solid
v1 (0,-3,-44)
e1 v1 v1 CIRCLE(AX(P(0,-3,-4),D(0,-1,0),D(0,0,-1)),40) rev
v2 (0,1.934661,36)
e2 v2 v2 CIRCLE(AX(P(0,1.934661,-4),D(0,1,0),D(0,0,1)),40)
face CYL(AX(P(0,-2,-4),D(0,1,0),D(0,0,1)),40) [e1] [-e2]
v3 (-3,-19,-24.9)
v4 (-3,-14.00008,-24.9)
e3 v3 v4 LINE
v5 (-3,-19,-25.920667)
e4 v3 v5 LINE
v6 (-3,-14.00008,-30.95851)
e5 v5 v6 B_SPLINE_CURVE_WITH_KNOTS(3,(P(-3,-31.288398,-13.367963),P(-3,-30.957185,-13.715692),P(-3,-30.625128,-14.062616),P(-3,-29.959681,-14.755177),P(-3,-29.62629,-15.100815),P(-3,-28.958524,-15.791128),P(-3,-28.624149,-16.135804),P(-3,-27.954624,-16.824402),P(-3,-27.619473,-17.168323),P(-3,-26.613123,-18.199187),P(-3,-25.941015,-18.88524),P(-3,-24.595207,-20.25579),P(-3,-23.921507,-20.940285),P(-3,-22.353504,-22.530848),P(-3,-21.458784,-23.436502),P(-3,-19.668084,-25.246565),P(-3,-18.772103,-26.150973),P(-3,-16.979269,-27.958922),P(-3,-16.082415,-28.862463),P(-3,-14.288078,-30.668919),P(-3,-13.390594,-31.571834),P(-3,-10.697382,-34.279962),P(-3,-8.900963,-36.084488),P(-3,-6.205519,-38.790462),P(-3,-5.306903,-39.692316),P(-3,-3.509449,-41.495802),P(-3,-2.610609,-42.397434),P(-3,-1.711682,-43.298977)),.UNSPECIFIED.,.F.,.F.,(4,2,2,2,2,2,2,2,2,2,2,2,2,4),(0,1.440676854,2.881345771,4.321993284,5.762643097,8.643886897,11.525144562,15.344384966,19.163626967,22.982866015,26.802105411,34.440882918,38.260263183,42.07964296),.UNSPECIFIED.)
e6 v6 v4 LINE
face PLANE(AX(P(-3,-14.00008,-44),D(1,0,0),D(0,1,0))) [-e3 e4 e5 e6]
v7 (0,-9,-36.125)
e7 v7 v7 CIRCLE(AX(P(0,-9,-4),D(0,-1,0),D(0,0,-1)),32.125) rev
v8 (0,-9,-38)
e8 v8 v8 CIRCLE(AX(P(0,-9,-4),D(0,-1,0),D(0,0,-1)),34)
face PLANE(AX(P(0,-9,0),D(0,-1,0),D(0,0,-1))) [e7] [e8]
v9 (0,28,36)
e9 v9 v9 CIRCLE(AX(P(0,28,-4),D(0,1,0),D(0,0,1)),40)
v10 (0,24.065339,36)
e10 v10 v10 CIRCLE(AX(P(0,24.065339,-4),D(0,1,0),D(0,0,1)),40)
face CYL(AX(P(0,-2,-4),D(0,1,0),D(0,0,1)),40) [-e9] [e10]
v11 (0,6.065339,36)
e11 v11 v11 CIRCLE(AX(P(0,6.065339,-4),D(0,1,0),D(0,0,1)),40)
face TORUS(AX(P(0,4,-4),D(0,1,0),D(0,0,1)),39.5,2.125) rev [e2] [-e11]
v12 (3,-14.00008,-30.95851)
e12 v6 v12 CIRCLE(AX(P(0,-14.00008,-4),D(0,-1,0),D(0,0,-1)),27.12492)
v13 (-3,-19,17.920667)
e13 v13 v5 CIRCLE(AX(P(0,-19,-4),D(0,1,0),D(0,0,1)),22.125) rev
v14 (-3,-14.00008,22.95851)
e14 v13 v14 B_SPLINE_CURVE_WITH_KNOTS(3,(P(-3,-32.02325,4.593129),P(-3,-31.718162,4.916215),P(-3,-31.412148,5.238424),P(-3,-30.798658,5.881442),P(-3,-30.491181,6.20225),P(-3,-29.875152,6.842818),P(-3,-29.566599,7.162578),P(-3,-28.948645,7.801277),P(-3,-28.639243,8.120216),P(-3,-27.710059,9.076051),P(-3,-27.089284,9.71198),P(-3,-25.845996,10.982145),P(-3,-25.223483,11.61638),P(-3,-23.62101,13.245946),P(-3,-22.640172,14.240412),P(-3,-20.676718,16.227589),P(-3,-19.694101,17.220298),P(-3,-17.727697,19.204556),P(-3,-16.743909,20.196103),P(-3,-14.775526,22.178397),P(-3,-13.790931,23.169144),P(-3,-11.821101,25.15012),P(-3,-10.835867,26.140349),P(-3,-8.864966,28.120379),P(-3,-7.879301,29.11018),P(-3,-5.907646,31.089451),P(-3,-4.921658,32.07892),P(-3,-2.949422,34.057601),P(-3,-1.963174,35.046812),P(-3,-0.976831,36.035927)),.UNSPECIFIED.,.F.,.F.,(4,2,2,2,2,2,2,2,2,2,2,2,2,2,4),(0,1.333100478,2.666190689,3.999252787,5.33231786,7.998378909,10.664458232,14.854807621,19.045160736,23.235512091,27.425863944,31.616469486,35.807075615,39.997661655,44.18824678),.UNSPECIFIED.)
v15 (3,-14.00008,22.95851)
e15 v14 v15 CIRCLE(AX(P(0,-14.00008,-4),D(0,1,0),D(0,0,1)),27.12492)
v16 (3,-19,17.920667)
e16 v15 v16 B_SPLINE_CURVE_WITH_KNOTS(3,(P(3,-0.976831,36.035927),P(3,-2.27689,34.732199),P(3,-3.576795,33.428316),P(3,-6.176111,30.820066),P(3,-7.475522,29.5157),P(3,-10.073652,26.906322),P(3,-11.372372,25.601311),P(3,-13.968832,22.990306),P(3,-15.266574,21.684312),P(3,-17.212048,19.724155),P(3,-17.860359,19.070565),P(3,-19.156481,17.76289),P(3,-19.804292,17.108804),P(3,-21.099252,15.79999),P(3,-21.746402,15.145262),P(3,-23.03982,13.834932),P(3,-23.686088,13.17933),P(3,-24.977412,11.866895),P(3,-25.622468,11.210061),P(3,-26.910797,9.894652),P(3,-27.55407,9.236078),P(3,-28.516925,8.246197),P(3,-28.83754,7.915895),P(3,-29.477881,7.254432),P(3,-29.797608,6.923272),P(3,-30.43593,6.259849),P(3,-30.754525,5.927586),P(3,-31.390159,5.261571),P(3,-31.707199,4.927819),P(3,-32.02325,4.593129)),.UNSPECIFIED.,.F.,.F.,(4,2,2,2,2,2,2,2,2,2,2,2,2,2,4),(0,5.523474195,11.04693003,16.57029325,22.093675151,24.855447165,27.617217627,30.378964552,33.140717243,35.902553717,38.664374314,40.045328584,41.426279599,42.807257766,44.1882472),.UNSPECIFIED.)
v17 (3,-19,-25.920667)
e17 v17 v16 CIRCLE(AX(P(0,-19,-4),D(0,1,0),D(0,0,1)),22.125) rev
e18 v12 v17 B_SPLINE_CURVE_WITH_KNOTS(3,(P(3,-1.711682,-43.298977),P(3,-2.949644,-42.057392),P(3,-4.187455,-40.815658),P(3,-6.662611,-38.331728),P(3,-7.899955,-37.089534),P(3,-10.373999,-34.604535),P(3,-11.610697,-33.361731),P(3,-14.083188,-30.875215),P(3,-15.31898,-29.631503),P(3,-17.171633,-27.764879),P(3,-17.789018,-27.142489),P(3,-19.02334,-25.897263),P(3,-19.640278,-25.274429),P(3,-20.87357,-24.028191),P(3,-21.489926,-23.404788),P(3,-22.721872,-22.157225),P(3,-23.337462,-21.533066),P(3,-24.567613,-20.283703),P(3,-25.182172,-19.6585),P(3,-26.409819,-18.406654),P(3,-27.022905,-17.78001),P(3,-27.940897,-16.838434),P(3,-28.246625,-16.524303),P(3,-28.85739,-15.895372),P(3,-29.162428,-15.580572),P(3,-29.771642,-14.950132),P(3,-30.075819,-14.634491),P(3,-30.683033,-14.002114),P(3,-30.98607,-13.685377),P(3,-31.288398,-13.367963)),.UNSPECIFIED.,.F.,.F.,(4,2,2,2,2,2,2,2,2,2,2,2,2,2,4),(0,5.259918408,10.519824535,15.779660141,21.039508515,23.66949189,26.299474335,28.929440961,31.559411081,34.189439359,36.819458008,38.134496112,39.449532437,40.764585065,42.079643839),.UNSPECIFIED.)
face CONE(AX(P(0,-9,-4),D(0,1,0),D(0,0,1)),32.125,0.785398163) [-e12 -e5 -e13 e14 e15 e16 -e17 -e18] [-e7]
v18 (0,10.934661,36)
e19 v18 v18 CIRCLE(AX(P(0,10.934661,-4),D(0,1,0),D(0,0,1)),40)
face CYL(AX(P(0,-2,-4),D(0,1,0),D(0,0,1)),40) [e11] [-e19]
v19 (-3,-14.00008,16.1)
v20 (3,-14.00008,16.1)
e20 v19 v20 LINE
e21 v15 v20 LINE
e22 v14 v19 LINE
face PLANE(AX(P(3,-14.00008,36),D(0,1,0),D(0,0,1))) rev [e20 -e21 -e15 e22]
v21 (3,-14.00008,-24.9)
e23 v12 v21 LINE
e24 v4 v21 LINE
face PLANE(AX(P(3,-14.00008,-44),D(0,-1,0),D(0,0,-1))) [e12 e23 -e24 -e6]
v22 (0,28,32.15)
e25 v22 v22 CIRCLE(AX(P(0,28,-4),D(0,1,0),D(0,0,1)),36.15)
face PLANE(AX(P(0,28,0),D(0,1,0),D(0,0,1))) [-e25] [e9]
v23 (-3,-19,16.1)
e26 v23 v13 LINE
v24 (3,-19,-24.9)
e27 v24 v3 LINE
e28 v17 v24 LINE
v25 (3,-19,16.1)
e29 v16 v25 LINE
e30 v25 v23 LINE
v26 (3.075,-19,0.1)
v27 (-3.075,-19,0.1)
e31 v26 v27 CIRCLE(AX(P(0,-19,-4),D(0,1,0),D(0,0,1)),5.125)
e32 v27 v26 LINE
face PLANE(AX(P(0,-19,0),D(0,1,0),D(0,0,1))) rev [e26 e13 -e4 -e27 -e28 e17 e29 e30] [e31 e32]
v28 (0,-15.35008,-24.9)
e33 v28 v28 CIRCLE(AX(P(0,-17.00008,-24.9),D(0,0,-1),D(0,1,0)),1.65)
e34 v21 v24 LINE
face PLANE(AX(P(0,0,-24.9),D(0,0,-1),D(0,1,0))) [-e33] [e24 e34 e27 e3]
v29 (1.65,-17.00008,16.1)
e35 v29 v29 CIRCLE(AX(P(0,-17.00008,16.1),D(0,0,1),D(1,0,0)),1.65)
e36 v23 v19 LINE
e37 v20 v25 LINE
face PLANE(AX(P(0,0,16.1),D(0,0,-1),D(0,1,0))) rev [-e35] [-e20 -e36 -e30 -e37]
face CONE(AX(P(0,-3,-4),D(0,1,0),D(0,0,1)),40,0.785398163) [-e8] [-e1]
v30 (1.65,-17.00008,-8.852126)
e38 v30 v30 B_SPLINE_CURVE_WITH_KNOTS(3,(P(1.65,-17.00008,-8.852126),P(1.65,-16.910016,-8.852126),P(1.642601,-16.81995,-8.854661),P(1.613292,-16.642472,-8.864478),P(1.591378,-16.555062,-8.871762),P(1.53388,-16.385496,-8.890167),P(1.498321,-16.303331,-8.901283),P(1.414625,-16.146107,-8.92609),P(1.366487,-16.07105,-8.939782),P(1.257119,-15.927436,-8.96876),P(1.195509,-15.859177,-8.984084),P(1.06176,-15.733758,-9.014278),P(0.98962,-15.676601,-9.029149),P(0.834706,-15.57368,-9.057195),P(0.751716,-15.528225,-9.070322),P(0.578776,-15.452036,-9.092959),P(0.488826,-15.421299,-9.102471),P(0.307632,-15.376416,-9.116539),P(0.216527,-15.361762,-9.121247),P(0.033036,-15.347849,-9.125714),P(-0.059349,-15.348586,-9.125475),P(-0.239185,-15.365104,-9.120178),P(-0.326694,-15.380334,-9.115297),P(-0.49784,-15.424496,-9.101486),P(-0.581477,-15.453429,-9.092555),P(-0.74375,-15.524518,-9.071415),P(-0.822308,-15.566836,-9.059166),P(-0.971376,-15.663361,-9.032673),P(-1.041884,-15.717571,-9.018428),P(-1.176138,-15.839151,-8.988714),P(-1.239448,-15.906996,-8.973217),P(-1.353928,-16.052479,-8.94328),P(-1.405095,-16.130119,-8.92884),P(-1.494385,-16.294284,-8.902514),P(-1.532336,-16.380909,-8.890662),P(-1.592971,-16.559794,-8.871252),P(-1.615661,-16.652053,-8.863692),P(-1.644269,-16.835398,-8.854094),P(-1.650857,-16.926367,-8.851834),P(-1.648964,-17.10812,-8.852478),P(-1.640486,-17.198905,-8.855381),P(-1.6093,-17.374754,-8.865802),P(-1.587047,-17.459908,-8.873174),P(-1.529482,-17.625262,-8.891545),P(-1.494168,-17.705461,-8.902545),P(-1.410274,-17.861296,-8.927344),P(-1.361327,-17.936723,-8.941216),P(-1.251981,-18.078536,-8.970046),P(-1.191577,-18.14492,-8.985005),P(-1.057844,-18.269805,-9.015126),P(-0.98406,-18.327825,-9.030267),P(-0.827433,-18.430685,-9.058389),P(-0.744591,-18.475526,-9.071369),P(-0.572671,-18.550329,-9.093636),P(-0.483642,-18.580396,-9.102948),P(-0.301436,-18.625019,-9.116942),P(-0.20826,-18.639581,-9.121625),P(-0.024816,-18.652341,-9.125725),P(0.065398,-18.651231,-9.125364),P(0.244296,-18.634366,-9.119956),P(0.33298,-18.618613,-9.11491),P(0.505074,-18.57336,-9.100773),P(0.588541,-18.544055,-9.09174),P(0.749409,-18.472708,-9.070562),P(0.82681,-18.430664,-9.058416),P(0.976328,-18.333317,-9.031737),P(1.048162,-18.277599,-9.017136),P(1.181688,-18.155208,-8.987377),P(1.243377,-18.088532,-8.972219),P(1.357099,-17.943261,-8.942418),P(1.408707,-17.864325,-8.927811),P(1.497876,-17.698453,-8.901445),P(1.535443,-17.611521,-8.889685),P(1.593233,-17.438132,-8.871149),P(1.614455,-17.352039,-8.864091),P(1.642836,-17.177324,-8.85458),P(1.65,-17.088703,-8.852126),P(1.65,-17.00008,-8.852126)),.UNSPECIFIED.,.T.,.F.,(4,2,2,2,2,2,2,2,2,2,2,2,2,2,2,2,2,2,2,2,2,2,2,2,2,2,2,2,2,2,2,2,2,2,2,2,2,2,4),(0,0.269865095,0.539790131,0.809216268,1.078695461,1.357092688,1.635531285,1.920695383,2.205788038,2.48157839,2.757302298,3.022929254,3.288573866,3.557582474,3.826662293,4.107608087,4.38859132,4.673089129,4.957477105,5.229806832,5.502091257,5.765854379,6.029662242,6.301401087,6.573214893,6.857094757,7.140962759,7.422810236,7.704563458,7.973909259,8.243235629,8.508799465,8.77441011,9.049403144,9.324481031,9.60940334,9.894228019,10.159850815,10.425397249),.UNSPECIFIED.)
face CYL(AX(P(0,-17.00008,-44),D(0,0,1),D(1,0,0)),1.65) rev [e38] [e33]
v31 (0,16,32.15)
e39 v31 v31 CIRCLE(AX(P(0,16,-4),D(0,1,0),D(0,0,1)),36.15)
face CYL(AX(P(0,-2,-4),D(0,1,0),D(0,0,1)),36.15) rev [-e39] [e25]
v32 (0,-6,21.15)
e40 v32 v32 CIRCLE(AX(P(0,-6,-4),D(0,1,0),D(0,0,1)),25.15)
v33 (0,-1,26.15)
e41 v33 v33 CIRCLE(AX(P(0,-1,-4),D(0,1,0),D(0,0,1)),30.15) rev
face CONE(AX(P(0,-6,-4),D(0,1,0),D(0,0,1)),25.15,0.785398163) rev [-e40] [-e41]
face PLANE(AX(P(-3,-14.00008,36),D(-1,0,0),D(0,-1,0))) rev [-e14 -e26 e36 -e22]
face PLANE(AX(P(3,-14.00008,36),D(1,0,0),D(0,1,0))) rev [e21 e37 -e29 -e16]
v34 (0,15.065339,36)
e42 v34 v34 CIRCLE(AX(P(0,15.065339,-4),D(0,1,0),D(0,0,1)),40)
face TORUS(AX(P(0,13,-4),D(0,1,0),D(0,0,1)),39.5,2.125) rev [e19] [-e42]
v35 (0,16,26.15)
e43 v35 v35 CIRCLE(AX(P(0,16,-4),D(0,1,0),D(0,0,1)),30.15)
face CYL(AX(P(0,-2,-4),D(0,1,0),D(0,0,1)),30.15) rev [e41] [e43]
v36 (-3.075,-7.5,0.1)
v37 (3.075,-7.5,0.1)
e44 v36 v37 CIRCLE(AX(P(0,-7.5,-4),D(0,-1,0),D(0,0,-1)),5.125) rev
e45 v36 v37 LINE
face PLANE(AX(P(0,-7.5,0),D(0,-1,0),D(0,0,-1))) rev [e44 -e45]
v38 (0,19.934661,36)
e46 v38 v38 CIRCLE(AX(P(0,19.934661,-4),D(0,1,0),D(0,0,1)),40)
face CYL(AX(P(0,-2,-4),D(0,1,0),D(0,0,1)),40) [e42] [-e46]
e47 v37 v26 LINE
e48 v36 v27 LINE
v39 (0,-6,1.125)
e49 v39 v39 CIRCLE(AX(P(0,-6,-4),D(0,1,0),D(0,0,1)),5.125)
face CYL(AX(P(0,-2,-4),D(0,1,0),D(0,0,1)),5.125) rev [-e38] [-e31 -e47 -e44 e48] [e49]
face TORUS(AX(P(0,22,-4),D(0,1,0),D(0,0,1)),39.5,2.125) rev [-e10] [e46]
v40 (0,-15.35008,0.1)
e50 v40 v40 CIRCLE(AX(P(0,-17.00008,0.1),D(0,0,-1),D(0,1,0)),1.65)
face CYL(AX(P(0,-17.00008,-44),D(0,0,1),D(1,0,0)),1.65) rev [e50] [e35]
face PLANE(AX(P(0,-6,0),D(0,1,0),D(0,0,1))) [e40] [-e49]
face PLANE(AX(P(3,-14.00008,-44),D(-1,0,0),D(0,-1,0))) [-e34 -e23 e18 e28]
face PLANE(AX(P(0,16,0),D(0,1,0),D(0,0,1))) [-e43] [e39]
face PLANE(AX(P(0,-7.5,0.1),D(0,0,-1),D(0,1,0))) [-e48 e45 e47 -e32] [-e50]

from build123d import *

# Parameters (mm, degrees)
CHAMFER_1_SIZE      = 5
EXTRUDE_START       = -11.5
EXTRUDE_1_DEPTH     = 11.5
CHAMFER_2_SIZE      = 12
CUT_EXTRUDE_START   = -16
SKETCH_4_W          = 6
SKETCH_4_H          = 6
CUT_EXTRUDE_1_DEPTH = 50.793692707
CUT_EXTRUDE_START_2 = 25
SKETCH_4_2_W        = 6
SKETCH_4_2_H        = 6
CUT_EXTRUDE_2_DEPTH = 41.793692707
SKETCH_5_R          = 1.65
CUT_EXTRUDE_3_DEPTH = 78.433907302
CHAMFER_3_SIZE      = 6


with BuildPart() as part:
    # ｽｹｯﾁ2 → 回転1 (revolve)
    with BuildSketch(Plane(origin=(0, 0, 0), x_dir=(0, 0, -1), z_dir=(1, 0, 0))):
        with BuildLine():
            Line((-16.125, -19), (-1.125, -19))
            Line((-1.125, -19), (-1.125, -6))
            Line((-1.125, -6), (-26.15, -6))
            Line((-26.15, -6), (-26.15, 16))
            Line((-26.15, 16), (-32.15, 16))
            Line((-32.15, 16), (-32.15, 28))
            Line((-32.15, 28), (-36, 28))
            Line((-36, 28), (-36, 24.065338955))
            ThreePointArc((-36, 24.065338955), (-34.186012747, 23.670048652), (-33.375, 22))
            ThreePointArc((-33.375, 22), (-34.186012747, 20.329951348), (-36, 19.934661045))
            Line((-36, 19.934661045), (-36, 15.065338955))
            ThreePointArc((-36, 15.065338955), (-34.186012747, 14.670048652), (-33.375, 13))
            ThreePointArc((-33.375, 13), (-34.186012747, 11.329951348), (-36, 10.934661045))
            Line((-36, 10.934661045), (-36, 6.065338955))
            ThreePointArc((-36, 6.065338955), (-34.186012747, 5.670048652), (-33.375, 4))
            ThreePointArc((-33.375, 4), (-34.186012747, 2.329951348), (-36, 1.934661045))
            Line((-36, 1.934661045), (-36, -9))
            Line((-36, -9), (-16.125, -9))
            Line((-16.125, -9), (-16.125, -19))
        make_face()
    revolve(axis=Axis((0, -2, -4), (0, -1, 0)))

    # 面取り1
    chamfer_1_edges = [part.edges().sort_by_distance(p)[0] for p in [
        (0, -6, -34.15),
    ]]
    chamfer(chamfer_1_edges, length=CHAMFER_1_SIZE)

    # ｽｹｯﾁ3 → ﾎﾞｽ - 押し出し1 (add)
    with BuildSketch(Plane.XZ.offset(19).offset(EXTRUDE_START)):
        with BuildLine():
            ThreePointArc((3.075, 0.1), (0, 1.125), (-3.075, 0.1))
            Line((-3.075, 0.1), (3.075, 0.1))
        make_face()
    extrude(amount=EXTRUDE_1_DEPTH)

    # 面取り2
    # the kernel refuses this chamfer: 12 mm, written as the material it adds along each edge
    with BuildSketch(Plane(origin=(0, -9, -4), x_dir=(0, 0, 1), z_dir=(1, 0, 0))) as chamfer_2_piece_1_section:
        Polygon((20.125, CHAMFER_2_SIZE), (20.125 + CHAMFER_2_SIZE, 0), (20.125, 0), align=None)
    chamfer_2_piece_1 = revolve(axis=Axis((0, -9, -4), (0, -1, 0)), mode=Mode.PRIVATE)
    chamfer_2_piece_1 = split(chamfer_2_piece_1, bisect_by=Plane(origin=(0, -19, -31.134676639), z_dir=(0, 1, 0)), keep=Keep.TOP, mode=Mode.PRIVATE)
    add(chamfer_2_piece_1)

    # ｽｹｯﾁ4 → ｶｯﾄ - 押し出し1 (cut, through all)
    with BuildSketch(Plane(origin=(0, 0, 0.1), x_dir=(-1, 0, 0), z_dir=(0, 0, -1)).offset(CUT_EXTRUDE_START)):
        with Locations((0, -17.000080491)):
            Rectangle(SKETCH_4_W, SKETCH_4_H)
    extrude(amount=-CUT_EXTRUDE_1_DEPTH, mode=Mode.SUBTRACT)

    # ｽｹｯﾁ4<2> → ｶｯﾄ - 押し出し2 (cut, through all)
    with BuildSketch(Plane(origin=(0, 0, 0.1), x_dir=(-1, 0, 0), z_dir=(0, 0, -1)).offset(CUT_EXTRUDE_START_2)):
        with Locations((0, -17.000080491)):
            Rectangle(SKETCH_4_2_W, SKETCH_4_2_H)
    extrude(amount=CUT_EXTRUDE_2_DEPTH, mode=Mode.SUBTRACT)

    # ｽｹｯﾁ5 → ｶｯﾄ - 押し出し3 (cut, through all)
    with BuildSketch(Plane.XY.offset(16.1)):
        with Locations((0, -17.000080491)):
            Circle(SKETCH_5_R)
    extrude(amount=-CUT_EXTRUDE_3_DEPTH, mode=Mode.SUBTRACT)

    # 面取り3
    chamfer_3_edges = [part.edges().sort_by_distance(p)[0] for p in [
        (0, -9, -44),
    ]]
    chamfer(chamfer_3_edges, length=CHAMFER_3_SIZE)


solid = part.part
